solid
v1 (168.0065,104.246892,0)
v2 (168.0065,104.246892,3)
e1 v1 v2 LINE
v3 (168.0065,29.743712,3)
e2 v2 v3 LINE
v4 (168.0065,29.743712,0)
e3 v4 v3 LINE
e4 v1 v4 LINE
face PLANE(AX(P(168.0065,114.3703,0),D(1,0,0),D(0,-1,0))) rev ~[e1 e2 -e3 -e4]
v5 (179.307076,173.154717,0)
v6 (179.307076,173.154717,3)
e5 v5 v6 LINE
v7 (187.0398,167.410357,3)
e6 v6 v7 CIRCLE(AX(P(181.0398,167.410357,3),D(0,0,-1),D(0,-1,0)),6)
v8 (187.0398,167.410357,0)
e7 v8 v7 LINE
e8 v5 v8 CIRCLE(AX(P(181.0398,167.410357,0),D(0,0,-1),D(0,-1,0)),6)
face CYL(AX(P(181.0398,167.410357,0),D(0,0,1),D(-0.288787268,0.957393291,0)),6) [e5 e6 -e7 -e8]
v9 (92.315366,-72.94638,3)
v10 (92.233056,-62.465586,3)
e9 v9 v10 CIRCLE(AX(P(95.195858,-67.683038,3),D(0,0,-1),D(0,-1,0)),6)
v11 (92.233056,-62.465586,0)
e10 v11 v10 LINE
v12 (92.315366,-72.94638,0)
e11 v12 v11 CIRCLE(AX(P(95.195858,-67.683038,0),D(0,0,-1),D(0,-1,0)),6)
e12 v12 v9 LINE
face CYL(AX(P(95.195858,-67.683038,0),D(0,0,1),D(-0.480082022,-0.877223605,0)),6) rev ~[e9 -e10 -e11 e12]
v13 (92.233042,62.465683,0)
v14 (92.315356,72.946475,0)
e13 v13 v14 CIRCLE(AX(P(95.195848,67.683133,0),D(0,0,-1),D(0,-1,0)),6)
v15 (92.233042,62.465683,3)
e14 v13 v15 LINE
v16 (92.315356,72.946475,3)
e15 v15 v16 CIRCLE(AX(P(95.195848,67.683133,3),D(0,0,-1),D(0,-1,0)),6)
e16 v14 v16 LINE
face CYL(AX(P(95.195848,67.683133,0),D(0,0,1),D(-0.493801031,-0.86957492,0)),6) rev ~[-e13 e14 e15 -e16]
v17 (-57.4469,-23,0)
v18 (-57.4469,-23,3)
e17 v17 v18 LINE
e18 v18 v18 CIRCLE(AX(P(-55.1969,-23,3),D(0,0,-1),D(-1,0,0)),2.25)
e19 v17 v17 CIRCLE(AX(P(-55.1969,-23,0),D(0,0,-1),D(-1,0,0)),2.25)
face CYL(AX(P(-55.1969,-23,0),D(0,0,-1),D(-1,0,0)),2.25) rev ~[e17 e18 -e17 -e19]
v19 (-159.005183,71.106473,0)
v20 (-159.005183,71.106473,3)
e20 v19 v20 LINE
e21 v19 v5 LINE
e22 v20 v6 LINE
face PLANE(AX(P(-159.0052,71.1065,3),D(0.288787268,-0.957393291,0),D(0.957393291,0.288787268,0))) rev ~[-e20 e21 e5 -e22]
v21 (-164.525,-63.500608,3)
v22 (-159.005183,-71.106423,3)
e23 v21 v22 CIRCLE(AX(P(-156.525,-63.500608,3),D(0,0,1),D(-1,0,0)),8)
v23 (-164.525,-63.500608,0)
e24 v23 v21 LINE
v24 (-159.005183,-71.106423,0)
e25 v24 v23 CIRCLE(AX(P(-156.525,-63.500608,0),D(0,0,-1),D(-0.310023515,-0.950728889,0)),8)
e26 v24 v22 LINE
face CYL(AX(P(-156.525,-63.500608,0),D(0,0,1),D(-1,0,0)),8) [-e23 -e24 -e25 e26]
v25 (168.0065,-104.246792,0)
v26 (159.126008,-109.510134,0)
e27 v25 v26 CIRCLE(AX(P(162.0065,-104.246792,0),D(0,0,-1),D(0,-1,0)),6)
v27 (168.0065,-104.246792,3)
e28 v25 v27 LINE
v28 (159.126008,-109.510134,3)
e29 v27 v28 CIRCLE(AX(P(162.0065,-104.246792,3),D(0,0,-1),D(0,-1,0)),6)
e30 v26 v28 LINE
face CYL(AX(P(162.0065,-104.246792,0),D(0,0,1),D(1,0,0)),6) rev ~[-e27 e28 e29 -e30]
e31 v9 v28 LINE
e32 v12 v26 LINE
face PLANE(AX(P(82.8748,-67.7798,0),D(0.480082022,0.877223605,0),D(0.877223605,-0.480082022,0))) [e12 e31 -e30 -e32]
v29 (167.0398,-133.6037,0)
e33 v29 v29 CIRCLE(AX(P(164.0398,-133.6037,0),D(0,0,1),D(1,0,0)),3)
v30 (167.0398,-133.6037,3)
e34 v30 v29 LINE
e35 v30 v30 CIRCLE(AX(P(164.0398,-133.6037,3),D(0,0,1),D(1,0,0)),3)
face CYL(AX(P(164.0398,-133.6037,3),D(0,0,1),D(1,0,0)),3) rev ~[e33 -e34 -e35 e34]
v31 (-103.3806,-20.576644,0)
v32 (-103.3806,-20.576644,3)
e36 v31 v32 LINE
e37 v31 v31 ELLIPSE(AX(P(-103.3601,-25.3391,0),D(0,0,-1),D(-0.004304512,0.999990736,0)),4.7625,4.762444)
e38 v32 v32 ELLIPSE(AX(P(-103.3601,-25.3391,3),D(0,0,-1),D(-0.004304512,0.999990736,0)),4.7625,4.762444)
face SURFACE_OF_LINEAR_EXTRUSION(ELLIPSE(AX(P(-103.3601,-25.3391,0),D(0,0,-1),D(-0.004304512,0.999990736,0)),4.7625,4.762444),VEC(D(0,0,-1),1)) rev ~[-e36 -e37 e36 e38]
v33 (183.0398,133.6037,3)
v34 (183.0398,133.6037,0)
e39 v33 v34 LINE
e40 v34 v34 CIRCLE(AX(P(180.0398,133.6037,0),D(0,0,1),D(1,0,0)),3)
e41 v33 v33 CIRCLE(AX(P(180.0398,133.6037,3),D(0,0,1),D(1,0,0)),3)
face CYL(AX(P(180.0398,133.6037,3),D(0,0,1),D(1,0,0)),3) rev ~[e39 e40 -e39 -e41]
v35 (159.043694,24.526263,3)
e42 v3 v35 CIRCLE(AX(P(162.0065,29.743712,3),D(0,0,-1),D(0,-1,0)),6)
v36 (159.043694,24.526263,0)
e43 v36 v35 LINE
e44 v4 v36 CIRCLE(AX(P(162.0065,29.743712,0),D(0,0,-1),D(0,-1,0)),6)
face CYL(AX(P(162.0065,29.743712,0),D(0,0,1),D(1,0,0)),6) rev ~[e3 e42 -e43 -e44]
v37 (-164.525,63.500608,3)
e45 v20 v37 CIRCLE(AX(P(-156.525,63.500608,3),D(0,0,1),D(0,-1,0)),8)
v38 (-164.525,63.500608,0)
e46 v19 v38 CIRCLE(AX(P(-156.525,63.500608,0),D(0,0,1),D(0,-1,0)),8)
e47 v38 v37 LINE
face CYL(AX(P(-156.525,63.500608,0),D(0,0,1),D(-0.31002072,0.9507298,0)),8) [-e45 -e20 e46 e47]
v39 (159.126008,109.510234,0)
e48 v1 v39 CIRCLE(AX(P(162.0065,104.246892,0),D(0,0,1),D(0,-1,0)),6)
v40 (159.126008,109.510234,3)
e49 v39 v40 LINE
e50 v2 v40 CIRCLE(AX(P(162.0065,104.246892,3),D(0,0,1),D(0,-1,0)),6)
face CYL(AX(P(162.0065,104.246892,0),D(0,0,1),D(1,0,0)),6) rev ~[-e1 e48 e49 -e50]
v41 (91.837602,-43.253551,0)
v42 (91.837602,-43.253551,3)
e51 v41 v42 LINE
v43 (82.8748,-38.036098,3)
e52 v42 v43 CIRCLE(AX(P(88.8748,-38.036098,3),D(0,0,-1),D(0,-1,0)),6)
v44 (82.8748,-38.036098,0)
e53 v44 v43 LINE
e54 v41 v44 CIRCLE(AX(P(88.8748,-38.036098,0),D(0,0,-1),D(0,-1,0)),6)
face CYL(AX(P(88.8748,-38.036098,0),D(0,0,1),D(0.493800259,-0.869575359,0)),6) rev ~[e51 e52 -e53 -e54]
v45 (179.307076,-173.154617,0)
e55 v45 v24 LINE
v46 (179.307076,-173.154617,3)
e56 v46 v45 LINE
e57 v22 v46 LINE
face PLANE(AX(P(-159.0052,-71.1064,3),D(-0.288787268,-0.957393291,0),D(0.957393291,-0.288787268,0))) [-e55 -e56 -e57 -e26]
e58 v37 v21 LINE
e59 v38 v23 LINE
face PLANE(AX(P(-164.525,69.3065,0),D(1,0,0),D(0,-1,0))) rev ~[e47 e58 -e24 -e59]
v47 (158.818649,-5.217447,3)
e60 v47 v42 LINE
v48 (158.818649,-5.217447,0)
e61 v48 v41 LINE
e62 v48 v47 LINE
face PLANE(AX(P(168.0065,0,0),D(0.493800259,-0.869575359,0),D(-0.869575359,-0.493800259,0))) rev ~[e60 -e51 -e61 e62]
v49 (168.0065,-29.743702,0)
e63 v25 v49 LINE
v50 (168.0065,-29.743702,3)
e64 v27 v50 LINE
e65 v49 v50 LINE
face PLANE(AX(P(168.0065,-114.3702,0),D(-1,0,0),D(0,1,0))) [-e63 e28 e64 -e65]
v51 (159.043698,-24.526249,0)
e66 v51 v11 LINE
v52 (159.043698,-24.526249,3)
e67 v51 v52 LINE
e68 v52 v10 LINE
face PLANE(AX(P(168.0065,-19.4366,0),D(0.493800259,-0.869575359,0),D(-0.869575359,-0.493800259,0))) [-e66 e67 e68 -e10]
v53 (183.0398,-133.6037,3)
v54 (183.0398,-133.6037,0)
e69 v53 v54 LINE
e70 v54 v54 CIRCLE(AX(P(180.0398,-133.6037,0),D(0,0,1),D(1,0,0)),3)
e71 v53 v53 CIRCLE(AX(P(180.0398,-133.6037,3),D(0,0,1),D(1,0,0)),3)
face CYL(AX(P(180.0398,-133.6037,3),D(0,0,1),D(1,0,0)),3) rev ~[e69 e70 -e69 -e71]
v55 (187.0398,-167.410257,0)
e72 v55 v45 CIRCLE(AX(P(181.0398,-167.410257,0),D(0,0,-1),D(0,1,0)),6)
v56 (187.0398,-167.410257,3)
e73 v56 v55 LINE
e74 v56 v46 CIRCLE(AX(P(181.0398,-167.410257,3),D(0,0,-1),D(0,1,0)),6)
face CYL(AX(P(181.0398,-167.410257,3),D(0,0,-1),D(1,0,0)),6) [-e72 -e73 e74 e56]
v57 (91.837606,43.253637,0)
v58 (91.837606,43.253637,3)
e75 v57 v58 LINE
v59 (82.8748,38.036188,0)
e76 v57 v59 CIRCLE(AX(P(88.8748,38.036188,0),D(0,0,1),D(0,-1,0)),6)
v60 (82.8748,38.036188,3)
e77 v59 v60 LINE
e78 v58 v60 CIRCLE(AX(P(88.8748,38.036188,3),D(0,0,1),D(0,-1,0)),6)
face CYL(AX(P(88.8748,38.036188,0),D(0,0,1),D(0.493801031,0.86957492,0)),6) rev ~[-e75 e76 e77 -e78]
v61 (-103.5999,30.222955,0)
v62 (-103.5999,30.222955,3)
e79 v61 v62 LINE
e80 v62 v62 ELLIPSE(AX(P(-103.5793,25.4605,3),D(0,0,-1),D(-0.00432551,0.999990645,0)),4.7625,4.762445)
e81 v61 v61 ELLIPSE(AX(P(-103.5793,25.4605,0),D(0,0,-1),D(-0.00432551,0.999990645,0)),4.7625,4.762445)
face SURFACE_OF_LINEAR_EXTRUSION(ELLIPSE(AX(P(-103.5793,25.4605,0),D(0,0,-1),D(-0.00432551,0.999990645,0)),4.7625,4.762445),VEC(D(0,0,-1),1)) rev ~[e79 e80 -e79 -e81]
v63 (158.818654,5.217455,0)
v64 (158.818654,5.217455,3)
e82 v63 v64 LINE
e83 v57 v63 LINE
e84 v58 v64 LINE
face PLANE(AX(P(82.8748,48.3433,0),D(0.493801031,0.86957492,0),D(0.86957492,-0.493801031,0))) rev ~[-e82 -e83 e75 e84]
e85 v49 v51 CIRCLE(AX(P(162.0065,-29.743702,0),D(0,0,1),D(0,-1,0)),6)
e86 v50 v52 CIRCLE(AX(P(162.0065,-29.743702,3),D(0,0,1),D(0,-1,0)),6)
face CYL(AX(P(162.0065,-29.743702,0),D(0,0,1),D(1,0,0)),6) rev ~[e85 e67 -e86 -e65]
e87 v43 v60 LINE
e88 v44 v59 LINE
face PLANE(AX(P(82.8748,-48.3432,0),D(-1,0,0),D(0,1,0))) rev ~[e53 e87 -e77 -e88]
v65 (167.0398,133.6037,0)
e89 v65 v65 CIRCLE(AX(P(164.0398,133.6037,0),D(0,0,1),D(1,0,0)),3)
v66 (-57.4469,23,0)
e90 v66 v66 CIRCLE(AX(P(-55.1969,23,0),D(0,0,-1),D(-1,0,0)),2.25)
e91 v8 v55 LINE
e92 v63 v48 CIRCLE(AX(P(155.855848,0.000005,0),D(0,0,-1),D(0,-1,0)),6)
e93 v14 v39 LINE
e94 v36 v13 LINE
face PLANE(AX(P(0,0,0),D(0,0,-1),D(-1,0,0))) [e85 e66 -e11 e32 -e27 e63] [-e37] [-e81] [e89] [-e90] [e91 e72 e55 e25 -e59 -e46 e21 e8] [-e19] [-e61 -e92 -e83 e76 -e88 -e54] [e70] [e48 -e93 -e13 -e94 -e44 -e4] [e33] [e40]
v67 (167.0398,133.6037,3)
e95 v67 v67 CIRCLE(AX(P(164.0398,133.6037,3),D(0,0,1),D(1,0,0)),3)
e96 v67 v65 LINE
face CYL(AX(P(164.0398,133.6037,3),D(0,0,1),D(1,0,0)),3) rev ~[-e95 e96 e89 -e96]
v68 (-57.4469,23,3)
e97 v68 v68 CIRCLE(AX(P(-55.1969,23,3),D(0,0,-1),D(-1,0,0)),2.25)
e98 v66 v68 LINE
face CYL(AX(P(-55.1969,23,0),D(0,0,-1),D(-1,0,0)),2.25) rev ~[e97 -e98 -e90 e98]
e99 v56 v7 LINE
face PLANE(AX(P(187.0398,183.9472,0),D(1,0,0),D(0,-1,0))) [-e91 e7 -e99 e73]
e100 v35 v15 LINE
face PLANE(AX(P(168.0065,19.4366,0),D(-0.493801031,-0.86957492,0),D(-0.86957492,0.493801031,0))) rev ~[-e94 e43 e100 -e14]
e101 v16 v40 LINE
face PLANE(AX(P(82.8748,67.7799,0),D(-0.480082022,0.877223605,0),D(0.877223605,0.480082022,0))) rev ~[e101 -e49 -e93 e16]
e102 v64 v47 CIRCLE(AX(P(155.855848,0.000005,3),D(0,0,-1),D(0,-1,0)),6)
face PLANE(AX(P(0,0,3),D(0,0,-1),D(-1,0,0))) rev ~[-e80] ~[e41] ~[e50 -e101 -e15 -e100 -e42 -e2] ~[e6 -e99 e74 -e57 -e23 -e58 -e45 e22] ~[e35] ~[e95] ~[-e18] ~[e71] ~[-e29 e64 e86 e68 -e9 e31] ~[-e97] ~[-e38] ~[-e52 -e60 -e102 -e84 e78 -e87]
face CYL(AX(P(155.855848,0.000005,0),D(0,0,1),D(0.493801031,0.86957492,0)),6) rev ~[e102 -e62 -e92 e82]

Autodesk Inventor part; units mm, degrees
ref_plane "YZ Plane" through (0, 0, 0) normal (1, 0, 0) x (0, 1, 0)
ref_plane "XZ Plane" through (0, 0, 0) normal (0, 1, 0) x (-1, 0, 0)
sketch "Base" plane through (0, 0, 0) normal (0, 0, 1) x (1, 0, 0)
  line L0 (-173.8499, -66.2658) -> (171.6188, -178.9186) construction
  line L1 (-9.525, -101.5493) -> (-9.525, 101.5493) construction
  line L2 (-9.525, 0) -> (-9.525, -119.85)
  line L3 (187.0398, -183.9472) -> (-9.525, -119.85)
  line L4 (187.0398, -183.9472) -> (187.0398, 0)
  line L5 (187.0398, 0) -> (-9.525, 0) construction
  line L6 (-9.525, 0) -> (-9.525, 119.85)
  line L7 (187.0398, 183.9472) -> (-9.525, 119.85)
  line L8 (187.0398, 183.9472) -> (187.0398, 0)
  point P0 (0, 0)
  point P1 (187.0398, -182.4643)
extrude "Plate1" add sketch "Base" along normal blind 3
sketch "MountHoles" plane through (0, 0, 0) normal (0, 0, -1) x (-1, 0, 0)
  line L0 (-179.0398, 172.9239) -> (1.525, 114.0441) construction
  circle A0 centre (-179.0398, 172.9239) radius 3
  circle A1 centre (1.525, 114.0441) radius 3
  line L1 (-226.3528, 0) -> (48.838, 0) construction
  circle A2 centre (-179.0398, -172.9239) radius 3
  circle A3 centre (1.525, -114.0441) radius 3
  line L2 (-187.0398, 183.9472) -> (9.525, 119.85) projected
  point P0 (0, 0)
  dimension "d2" = 6
  dimension "d3" = 6
  dimension "d45" = 8
extrude "MountHolesFeature" cut sketch "MountHoles" against normal blind 3
sketch "TorsoLiftMountHoles" plane through (0, 0, 3) normal (0, 0, 1) x (1, 0, 0)
  circle A0 centre (180.0398, -133.6037) radius 3 projected
  circle A1 centre (164.0398, -133.6037) radius 3 projected
  circle A2 centre (180.0398, 133.6037) radius 3 projected
  circle A3 centre (164.0398, 133.6037) radius 3 projected
  point P0 (0, 0)
extrude "TorsoLiftMountHolesFeature" cut sketch "TorsoLiftMountHoles" against normal blind 3
sketch "Continuation" plane through (0, 0, 0) normal (0, 0, -1) x (-1, 0, 0)
  line L0 (9.525, 119.85) -> (164.525, 69.3065)
  line L1 (-257.3528, 0) -> (234.838, 0) construction
  line L2 (9.525, -119.85) -> (164.525, -69.3065)
  line L3 (164.525, 69.3065) -> (164.525, -69.3065)
  line L4 (-187.0398, 183.9472) -> (9.525, 119.85)
  line L5 (9.525, 119.85) -> (9.525, -119.85)
  circle A0 centre (1.525, 114.0441) radius 3
  line L6 (1.525, 114.0441) -> (164.525, 60.8919) construction
  circle A1 centre (139.525, 69.0441) radius 3
  circle A2 centre (139.525, -69.0441) radius 3
  point P0 (0, 0)
  dimension "d46" = 155
  dimension "d47" = 25
sheet face with bend "ContinuationFeature" sketch "Continuation" thickness 3 toward (0, 0, 1) bend radius 3 contours L0 L3 L2 L5
bend "Bend2"
fillet "OutsideFilletsFeature" radius 8 4 edges at (187.0398, -183.9472, 1.5) (187.0398, 183.9472, 1.5) (-164.525, 69.3065, 1.5) (-164.525, -69.3065, 1.5)
ref_plane "MidPlane" through (0, -71.2585, 3.048) normal (1, 0, 0) x (0, 0, -1)
sketch "BottomMountHoles" plane through (0, 0, 0) normal (0, 0, -1) x (-1, 0, 0)
  circle A0 centre (18.4607, -50.75) radius 2.75 projected
  circle A1 centre (18.4607, -8.25) radius 2.75 projected
  circle A2 centre (18.4607, 8.25) radius 2.75 projected
  circle A3 centre (18.4607, 50.75) radius 2.75 projected
  ellipse E0 centre (103.3601, -25.3391) end of major axis (108.1225, -25.3596) minor radius 4.7625 projected
  ellipse E1 centre (103.5793, 25.4605) end of major axis (108.3417, 25.4399) minor radius 4.7625 projected
  spline S0 degree 3 poles (-22.2189, -83.25) (-22.5891, -83.25) (-22.9886, -83.178) (-23.6929, -82.9105) (-24.0824, -82.71) (-24.7238, -82.1045) (-24.9548, -81.7839) (-25.3958, -80.8943) (-25.4483, -80.428) (-25.4764, -79.9859) (-25.4838, -79.5156) (-25.1415, -78.5243) (-24.922, -78.15) (-24.3999, -77.5609) (-24.0923, -77.3244) (-23.5146, -77.014) (-23.2534, -76.9113) (-22.8383, -76.8067) (-22.5689, -76.75) (-22.2189, -76.75) knots 0 0 0 0 0.111053 0.111053 0.202489 0.202489 0.273701 0.273701 0.38581 0.38581 0.497395 0.497395 0.578796 0.578796 0.654724 0.654724 0.709985 0.709985 0.740525 0.740525 0.740525 0.740525 construction
  arc A4 (-22.2189, 83.25) -> (-22.2189, 76.75) centre (-22.2189, 80) ccw construction
  arc A5 (-133.7189, -83.25) -> (-133.7189, -76.75) centre (-133.7189, -80) ccw construction
  spline S1 degree 3 poles (-133.7189, 83.25) (-133.3487, 83.25) (-132.9492, 83.178) (-132.2449, 82.9105) (-131.8554, 82.71) (-131.2141, 82.1045) (-130.983, 81.7839) (-130.542, 80.8943) (-130.4896, 80.428) (-130.4615, 79.9859) (-130.4541, 79.5156) (-130.7963, 78.5243) (-131.0158, 78.15) (-131.538, 77.5609) (-131.8456, 77.3244) (-132.4232, 77.014) (-132.6845, 76.9113) (-133.0996, 76.8067) (-133.3689, 76.75) (-133.7189, 76.75) knots 0 0 0 0 0.111053 0.111053 0.202489 0.202489 0.273701 0.273701 0.38581 0.38581 0.497395 0.497395 0.578796 0.578796 0.654725 0.654725 0.709986 0.709986 0.740527 0.740527 0.740527 0.740527 construction
  line L0 (167.4427, 0) -> (-246.1203, 0) construction
  point P0 (0, 0)
extrude "Cut8" cut sketch "BottomMountHoles" against normal blind 3 contours E0 | E1
delete faces "Delete1" heal yes whole lump no faces at (-139.4042, 72.0417, 2) (-4.5153, 113.8027, 2) (179.1606, 175.9215, 2) (179.1606, -169.9264, 2) (-4.5153, -114.2855, 2) (-139.4042, -66.0465, 2)
sketch "Sketch15" plane through (187.0398, -172.9239, 3) normal (0, 0, 1) x (1, 0, 0)
  line L0 (-346.045, 244.0304) -> (-10.4802, 353.4537) projected
  line L1 (-346.045, 244.0304) -> (-0.3836, 348.2954)
  line L2 (-423.7471, 172.9239) -> (72.8866, 172.9239) construction
  line L3 (0, 345.8479) -> (0, 0) projected
  arc A0 (0, 345.8479) -> (-10.4802, 353.4537) centre (-8, 345.8479) ccw projected
  arc A1 (-346.045, 244.0304) -> (-351.5648, 236.4246) centre (-343.5648, 236.4246) ccw projected
  line L4 (-351.5648, 109.4233) -> (-351.5648, 236.4246) projected
  line L5 (-346.045, 101.8175) -> (-0.3836, -2.4475)
  arc A2 (-10.4802, -7.6058) -> (0, 0) centre (-8, 0) ccw projected
  line L6 (-10.4802, -7.6058) -> (-346.045, 101.8175) projected
  arc A3 (-351.5648, 109.4233) -> (-346.045, 101.8175) centre (-343.5648, 109.4233) ccw projected
  point P0 (-187.0398, 172.9239)
  dimension "d84" = 178.725
extrude "AdjustToProductionFeature" cut sketch "Sketch15" against normal blind 3 contours L0 A0 L1 | L5 A2 L6
delete faces "Delete2" heal yes whole lump no faces at (187.0208, 173.4763, 1) (187.0208, -173.4763, 2)
fillet "Fillet5" radius 6 2 edges at (187.0398, 175.4872, 1.5) (187.0398, -175.4872, 1.5)
sketch "ContactorMount" plane through (-164.525, -63.5006, 0) normal (0, 0, -1) x (-1, 0, 0)
  circle A0 centre (-109.3281, 40.5006) radius 2.25 projected
  circle A1 centre (-109.3281, 86.5006) radius 2.25 projected
  point P0 (-164.525, 63.5006)
extrude "Cut12" cut sketch "ContactorMount" against normal blind 3
sketch "Sketch19" plane through (-164.525, -63.5006, 0) normal (0, 0, -1) x (-1, 0, 0)
  line L0 (-332.5315, 63.5006) -> (-247.3998, 15.1574)
  line L1 (-247.3998, 15.1574) -> (-247.3998, 111.8439)
  line L2 (-247.3998, 111.8439) -> (-332.5315, 63.5006)
  line L3 (-332.5315, 82.9372) -> (-247.3998, 131.2805)
  line L4 (-247.3998, 131.2805) -> (-332.5315, 177.8709)
  line L5 (-332.5315, 177.8709) -> (-332.5315, 82.9372)
  line L6 (-351.5648, -103.9097) -> (-351.5648, 230.9109) projected
  line L7 (-351.5648, 63.5006) -> (0, 63.5006) construction
  line L8 (0, 0) -> (0, 127.0012) projected
  line L9 (-332.5315, 63.5006) -> (-332.5315, 82.9372) construction
  line L10 (-247.3998, 111.8439) -> (-247.3998, 131.2805) construction
  line L11 (-332.5315, 44.064) -> (-247.3998, -4.2792)
  line L12 (-247.3998, -4.2792) -> (-332.5315, -50.8696)
  line L13 (-332.5315, -50.8696) -> (-332.5315, 44.064)
  point P0 (-164.525, 63.5006)
  point P1 (-247.3998, 63.5006)
extrude "Cut13" cut sketch "Sketch19" against normal blind 3
fillet "Fillet8" radius 6 9 edges at (168.0065, -19.4366, 1.5) (168.0065, -114.3703, 1.5) (82.8748, -67.7798, 1.5) (82.8748, -48.3432, 1.5) (168.0065, 0, 1.5) (82.8748, 48.3432, 1.5) (168.0065, 19.4366, 1.5) (82.8748, 67.7798, 1.5) (168.0065, 114.3703, 1.5)
equation "\"d7\" = Thickness"
equation "\"d43\" = Thickness"
equation "\"d82\" = Thickness"
equation "\"d85\" = Thickness"
equation "\"d0\" = Thickness"
equation "\"d48\" = BendRadius"
equation "\"d49\" = BendReliefWidth"
equation "\"d51\" = MinimumRemnant"
equation "\"d50\" = BendReliefDepth"
equation "\"d52\" = TransitionRadius"
equation "\"BendRadius\" = Thickness"
equation "\"BendReliefWidth\" = Thickness"
equation "\"BendReliefDepth\" = 0.5 * Thickness"
equation "\"CornerReliefSize\" = 4 * Thickness"
equation "\"MinimumRemnant\" = 2 * Thickness"
equation "\"TransitionRadius\" = BendRadius"
equation "\"JacobiRadiusSize\" = BendRadius"
equation "\"GapSize\" = Thickness"
equation "\"Thickness\" = 3"
